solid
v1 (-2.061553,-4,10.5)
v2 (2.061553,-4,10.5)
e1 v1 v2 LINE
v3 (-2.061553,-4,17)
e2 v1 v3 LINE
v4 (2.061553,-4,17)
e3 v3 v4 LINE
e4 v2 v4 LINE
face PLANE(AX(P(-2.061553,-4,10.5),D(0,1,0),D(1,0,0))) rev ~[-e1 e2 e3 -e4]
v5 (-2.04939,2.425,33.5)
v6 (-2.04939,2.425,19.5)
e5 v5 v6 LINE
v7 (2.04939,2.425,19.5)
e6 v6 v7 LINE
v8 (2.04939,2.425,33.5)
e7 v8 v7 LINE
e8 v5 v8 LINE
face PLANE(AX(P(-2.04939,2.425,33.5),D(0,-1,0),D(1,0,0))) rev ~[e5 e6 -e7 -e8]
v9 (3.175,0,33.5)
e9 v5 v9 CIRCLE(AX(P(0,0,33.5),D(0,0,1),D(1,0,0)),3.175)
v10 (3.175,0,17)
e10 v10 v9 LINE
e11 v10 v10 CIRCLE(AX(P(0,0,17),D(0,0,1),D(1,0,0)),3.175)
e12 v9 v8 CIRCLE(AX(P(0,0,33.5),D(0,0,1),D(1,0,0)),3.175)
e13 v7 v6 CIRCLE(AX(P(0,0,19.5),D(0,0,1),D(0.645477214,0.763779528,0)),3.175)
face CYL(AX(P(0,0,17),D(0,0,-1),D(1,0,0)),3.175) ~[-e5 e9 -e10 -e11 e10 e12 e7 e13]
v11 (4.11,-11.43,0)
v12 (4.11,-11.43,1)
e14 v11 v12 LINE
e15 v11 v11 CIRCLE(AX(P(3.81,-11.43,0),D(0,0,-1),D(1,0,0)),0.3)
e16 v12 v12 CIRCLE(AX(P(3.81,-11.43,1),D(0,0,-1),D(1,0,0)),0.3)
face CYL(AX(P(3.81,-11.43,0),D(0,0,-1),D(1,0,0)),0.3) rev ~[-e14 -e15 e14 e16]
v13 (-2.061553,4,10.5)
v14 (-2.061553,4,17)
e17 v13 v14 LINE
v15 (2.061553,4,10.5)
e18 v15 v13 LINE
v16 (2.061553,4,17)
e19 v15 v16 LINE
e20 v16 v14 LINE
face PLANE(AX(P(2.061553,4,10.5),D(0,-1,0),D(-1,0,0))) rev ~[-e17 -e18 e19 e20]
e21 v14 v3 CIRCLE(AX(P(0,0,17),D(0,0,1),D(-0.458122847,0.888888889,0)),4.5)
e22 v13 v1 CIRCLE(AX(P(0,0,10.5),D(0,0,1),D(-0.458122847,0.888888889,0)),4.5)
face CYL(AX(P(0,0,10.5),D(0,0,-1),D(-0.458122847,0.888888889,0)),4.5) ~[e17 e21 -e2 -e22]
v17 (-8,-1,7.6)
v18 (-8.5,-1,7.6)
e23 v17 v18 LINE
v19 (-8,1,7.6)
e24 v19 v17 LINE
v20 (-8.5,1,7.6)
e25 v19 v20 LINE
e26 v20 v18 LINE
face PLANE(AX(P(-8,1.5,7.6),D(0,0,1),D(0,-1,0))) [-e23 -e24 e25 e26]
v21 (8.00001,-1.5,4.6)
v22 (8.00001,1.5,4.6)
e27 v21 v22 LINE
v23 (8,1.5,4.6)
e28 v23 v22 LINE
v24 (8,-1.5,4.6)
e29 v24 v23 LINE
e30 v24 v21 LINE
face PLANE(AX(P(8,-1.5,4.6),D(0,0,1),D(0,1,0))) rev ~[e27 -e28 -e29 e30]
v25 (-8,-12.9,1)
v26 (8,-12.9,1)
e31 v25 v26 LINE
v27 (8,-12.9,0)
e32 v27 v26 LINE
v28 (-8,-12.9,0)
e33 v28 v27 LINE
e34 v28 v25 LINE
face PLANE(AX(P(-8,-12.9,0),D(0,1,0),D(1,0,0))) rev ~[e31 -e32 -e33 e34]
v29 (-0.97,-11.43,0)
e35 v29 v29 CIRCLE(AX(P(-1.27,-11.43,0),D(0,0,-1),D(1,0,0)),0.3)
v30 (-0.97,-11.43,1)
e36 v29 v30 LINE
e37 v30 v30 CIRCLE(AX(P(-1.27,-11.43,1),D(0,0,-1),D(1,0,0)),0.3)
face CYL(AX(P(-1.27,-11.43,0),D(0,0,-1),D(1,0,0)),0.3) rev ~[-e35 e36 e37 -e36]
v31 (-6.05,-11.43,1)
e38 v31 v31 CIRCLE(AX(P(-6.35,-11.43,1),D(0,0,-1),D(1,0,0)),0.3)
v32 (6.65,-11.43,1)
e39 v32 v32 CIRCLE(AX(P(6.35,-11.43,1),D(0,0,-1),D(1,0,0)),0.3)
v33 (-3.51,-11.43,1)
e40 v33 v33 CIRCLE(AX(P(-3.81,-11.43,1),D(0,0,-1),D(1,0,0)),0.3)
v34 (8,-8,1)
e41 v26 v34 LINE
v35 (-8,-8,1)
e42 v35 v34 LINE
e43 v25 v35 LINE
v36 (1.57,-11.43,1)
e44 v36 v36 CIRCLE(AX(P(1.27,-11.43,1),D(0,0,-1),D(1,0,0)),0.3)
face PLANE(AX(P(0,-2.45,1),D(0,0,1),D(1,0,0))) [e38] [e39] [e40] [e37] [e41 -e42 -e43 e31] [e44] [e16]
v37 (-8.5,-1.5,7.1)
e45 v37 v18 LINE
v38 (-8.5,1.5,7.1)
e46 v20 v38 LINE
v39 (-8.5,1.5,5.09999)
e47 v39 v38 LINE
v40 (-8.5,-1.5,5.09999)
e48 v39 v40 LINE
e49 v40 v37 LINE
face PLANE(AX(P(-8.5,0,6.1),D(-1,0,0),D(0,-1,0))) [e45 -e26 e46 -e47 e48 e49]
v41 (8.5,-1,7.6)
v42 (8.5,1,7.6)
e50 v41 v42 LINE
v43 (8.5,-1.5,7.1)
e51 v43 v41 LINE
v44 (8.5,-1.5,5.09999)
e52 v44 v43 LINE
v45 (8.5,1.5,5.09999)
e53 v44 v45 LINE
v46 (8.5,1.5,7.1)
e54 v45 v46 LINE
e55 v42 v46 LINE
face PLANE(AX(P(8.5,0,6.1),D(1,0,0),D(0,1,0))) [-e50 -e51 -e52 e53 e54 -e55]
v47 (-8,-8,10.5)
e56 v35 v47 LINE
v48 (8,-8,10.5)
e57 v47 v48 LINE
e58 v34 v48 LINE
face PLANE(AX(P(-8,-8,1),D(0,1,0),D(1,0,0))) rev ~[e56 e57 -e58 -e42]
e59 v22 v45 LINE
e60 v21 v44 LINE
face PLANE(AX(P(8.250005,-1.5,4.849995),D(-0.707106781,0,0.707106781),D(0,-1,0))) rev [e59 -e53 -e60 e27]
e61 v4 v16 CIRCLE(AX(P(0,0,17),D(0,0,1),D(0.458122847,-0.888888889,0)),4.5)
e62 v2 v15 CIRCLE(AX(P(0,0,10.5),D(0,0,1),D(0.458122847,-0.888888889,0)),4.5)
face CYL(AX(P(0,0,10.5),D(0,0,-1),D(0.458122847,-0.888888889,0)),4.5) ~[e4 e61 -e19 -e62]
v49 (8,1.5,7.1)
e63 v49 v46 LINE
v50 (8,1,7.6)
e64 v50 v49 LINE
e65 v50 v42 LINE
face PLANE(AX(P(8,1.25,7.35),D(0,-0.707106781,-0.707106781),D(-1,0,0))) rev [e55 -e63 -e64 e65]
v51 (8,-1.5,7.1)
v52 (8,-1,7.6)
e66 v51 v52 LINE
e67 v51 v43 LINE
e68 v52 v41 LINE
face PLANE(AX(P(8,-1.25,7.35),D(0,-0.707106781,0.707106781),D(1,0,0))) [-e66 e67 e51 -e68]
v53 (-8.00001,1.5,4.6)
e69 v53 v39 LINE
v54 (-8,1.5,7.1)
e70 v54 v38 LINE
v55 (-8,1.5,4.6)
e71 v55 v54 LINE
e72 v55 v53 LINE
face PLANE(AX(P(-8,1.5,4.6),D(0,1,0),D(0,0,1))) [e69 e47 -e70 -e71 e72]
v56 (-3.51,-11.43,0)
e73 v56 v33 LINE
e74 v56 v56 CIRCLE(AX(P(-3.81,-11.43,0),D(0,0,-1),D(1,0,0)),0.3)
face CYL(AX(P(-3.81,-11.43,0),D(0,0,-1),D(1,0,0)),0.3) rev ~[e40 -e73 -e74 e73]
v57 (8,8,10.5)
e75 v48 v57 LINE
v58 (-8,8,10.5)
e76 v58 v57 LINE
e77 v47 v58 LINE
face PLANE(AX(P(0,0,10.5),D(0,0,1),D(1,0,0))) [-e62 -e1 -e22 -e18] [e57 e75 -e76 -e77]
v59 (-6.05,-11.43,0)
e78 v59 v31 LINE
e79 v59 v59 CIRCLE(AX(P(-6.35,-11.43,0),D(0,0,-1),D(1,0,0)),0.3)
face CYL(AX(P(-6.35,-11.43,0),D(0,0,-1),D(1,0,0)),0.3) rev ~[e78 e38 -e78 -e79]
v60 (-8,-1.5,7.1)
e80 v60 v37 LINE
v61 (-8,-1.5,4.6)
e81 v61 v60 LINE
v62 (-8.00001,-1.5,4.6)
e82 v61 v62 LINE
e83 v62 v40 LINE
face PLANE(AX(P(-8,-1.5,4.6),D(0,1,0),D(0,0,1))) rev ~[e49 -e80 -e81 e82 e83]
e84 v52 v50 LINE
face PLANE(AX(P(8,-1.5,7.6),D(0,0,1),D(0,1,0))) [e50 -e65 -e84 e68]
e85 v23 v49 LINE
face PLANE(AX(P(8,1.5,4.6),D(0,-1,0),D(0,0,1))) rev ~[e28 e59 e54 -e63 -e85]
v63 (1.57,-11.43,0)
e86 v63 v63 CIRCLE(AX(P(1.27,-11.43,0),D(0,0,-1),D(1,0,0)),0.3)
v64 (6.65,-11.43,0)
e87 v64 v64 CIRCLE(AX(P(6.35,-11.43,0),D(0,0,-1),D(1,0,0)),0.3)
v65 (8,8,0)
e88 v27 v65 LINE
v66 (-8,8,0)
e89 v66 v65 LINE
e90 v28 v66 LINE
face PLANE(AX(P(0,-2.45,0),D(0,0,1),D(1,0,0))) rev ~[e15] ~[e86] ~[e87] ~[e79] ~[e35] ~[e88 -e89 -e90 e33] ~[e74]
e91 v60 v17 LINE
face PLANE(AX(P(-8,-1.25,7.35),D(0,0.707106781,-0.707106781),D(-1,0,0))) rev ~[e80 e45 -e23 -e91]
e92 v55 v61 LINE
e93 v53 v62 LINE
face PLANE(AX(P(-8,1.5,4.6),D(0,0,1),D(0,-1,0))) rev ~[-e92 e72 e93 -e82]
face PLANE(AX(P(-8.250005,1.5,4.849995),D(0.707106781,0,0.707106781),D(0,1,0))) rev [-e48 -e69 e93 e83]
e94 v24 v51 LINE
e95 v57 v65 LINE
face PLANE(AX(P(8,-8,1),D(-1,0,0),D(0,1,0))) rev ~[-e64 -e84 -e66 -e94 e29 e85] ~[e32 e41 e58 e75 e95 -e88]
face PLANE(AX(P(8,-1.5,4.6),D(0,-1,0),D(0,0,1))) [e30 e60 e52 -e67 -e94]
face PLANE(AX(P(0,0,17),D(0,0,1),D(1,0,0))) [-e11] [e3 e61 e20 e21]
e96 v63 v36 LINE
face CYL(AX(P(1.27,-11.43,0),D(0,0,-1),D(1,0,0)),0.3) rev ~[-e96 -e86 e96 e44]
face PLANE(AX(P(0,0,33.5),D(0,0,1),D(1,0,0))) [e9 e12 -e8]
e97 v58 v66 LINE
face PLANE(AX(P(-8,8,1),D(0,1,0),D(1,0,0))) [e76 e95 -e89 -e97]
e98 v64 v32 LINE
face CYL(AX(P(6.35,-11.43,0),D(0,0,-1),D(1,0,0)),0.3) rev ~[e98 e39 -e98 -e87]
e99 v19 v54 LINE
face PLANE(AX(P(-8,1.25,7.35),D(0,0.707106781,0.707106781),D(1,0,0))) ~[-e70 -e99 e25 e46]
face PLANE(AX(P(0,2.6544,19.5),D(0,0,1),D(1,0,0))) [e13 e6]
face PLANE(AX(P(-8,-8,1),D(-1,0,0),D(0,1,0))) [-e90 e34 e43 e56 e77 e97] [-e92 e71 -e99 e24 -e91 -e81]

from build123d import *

# Parameters (mm, degrees)
F0_W      = 16
F0_H      = 20.9
F1_DEPTH  = 1
F2_W      = 16
F2_H      = 16
F3_DEPTH  = 9.5
F5_DEPTH  = 6.5
F6_R      = 3.175
F7_DEPTH  = 16.5
F9_DEPTH  = 14
F10_R     = 0.3
F11_DEPTH = 1
F12_W     = 3
F12_H     = 3
F13_DEPTH = 0.5
F14_W     = 3
F14_H     = 3
F15_DEPTH = 0.5
F16_SIZE  = 0.5
F17_SIZE  = 0.49999
F18_SIZE  = 0.49999
F19_SIZE  = 0.5


# Not quite as in the source:
# - a fillet or chamfer is up to 0.001 mm smaller than in the source, because OpenCascade refuses the exact size


with BuildPart() as f1:
    # F0 (on Top) → F1 (new body)
    with BuildSketch(Plane.XY):
        with Locations((0, -2.45)):
            Rectangle(F0_W, F0_H)
    extrude(amount=F1_DEPTH)

    # F2 (on face) → F3 (join)
    with BuildSketch(Plane.XY.offset(1)):
        Rectangle(F2_W, F2_H)
    extrude(amount=F3_DEPTH)

    # F4 (on face) → F5 (join)
    with BuildSketch(Plane.XY.offset(10.5)):
        with BuildLine():
            Line((2.0615528128, 4), (-2.0615528128, 4))
            ThreePointArc((-2.0615528128, 4), (-4.5, 0), (-2.0615528128, -4))
            Line((-2.0615528128, -4), (2.0615528128, -4))
            ThreePointArc((2.0615528128, -4), (4.5, 0), (2.0615528128, 4))
        make_face()
    extrude(amount=F5_DEPTH)

    # F6 (on face) → F7 (join)
    with BuildSketch(Plane.XY.offset(17)):
        Circle(F6_R)
    extrude(amount=F7_DEPTH)

    # F8 (on face) → F9 (cut)
    with BuildSketch(Plane.XY.offset(33.5)):
        with BuildLine():
            ThreePointArc((2.0493901532, 2.425), (0, 3.175), (-2.0493901532, 2.425))
            Line((-2.0493901532, 2.425), (2.0493901532, 2.425))
        make_face()
    extrude(amount=-F9_DEPTH, mode=Mode.SUBTRACT)

    # F10 (on face) → F11 (cut, through all)
    with BuildSketch(Plane(origin=(0, 0, 0), x_dir=(1, 0, 0), z_dir=(0, 0, -1))):
        with Locations((-6.35, 11.43)):
            Circle(F10_R)
        with Locations((-3.81, 11.43)):
            Circle(F10_R)
        with Locations((-1.27, 11.43)):
            Circle(F10_R)
        with Locations((1.27, 11.43)):
            Circle(F10_R)
        with Locations((3.81, 11.43)):
            Circle(F10_R)
        with Locations((6.35, 11.43)):
            Circle(F10_R)
    extrude(amount=-F11_DEPTH, mode=Mode.SUBTRACT)

    # F12 (on face) → F13 (join)
    with BuildSketch(Plane(origin=(-8, 0, 0), x_dir=(0, -1, 0), z_dir=(-1, 0, 0))):
        with Locations((0, 6.1)):
            Rectangle(F12_W, F12_H)
    extrude(amount=F13_DEPTH)

    # F14 (on face) → F15 (join)
    with BuildSketch(Plane.YZ.offset(8)):
        with Locations((0, 6.1)):
            Rectangle(F14_W, F14_H)
    extrude(amount=F15_DEPTH)

    # F16
    f16_edges = [f1.edges().sort_by_distance(p)[0] for p in [
        (-8.25, 1.5, 7.6),
        (-8.25, -1.5, 7.6),
    ]]
    chamfer(f16_edges, length=F16_SIZE)

    # F17 (size 0.5 in the source; OpenCascade refuses exactly that, so slightly less here)
    f17_edges = [f1.edges().sort_by_distance(p)[0] for p in [
        (-8.5, 0, 4.6),
    ]]
    chamfer(f17_edges, length=F17_SIZE)

    # F18 (size 0.5 in the source; OpenCascade refuses exactly that, so slightly less here)
    f18_edges = [f1.edges().sort_by_distance(p)[0] for p in [
        (8.5, 0, 4.6),
    ]]
    chamfer(f18_edges, length=F18_SIZE)

    # F19
    f19_edges = [f1.edges().sort_by_distance(p)[0] for p in [
        (8.25, 1.5, 7.6),
        (8.25, -1.5, 7.6),
    ]]
    chamfer(f19_edges, length=F19_SIZE)


solid = f1.part
